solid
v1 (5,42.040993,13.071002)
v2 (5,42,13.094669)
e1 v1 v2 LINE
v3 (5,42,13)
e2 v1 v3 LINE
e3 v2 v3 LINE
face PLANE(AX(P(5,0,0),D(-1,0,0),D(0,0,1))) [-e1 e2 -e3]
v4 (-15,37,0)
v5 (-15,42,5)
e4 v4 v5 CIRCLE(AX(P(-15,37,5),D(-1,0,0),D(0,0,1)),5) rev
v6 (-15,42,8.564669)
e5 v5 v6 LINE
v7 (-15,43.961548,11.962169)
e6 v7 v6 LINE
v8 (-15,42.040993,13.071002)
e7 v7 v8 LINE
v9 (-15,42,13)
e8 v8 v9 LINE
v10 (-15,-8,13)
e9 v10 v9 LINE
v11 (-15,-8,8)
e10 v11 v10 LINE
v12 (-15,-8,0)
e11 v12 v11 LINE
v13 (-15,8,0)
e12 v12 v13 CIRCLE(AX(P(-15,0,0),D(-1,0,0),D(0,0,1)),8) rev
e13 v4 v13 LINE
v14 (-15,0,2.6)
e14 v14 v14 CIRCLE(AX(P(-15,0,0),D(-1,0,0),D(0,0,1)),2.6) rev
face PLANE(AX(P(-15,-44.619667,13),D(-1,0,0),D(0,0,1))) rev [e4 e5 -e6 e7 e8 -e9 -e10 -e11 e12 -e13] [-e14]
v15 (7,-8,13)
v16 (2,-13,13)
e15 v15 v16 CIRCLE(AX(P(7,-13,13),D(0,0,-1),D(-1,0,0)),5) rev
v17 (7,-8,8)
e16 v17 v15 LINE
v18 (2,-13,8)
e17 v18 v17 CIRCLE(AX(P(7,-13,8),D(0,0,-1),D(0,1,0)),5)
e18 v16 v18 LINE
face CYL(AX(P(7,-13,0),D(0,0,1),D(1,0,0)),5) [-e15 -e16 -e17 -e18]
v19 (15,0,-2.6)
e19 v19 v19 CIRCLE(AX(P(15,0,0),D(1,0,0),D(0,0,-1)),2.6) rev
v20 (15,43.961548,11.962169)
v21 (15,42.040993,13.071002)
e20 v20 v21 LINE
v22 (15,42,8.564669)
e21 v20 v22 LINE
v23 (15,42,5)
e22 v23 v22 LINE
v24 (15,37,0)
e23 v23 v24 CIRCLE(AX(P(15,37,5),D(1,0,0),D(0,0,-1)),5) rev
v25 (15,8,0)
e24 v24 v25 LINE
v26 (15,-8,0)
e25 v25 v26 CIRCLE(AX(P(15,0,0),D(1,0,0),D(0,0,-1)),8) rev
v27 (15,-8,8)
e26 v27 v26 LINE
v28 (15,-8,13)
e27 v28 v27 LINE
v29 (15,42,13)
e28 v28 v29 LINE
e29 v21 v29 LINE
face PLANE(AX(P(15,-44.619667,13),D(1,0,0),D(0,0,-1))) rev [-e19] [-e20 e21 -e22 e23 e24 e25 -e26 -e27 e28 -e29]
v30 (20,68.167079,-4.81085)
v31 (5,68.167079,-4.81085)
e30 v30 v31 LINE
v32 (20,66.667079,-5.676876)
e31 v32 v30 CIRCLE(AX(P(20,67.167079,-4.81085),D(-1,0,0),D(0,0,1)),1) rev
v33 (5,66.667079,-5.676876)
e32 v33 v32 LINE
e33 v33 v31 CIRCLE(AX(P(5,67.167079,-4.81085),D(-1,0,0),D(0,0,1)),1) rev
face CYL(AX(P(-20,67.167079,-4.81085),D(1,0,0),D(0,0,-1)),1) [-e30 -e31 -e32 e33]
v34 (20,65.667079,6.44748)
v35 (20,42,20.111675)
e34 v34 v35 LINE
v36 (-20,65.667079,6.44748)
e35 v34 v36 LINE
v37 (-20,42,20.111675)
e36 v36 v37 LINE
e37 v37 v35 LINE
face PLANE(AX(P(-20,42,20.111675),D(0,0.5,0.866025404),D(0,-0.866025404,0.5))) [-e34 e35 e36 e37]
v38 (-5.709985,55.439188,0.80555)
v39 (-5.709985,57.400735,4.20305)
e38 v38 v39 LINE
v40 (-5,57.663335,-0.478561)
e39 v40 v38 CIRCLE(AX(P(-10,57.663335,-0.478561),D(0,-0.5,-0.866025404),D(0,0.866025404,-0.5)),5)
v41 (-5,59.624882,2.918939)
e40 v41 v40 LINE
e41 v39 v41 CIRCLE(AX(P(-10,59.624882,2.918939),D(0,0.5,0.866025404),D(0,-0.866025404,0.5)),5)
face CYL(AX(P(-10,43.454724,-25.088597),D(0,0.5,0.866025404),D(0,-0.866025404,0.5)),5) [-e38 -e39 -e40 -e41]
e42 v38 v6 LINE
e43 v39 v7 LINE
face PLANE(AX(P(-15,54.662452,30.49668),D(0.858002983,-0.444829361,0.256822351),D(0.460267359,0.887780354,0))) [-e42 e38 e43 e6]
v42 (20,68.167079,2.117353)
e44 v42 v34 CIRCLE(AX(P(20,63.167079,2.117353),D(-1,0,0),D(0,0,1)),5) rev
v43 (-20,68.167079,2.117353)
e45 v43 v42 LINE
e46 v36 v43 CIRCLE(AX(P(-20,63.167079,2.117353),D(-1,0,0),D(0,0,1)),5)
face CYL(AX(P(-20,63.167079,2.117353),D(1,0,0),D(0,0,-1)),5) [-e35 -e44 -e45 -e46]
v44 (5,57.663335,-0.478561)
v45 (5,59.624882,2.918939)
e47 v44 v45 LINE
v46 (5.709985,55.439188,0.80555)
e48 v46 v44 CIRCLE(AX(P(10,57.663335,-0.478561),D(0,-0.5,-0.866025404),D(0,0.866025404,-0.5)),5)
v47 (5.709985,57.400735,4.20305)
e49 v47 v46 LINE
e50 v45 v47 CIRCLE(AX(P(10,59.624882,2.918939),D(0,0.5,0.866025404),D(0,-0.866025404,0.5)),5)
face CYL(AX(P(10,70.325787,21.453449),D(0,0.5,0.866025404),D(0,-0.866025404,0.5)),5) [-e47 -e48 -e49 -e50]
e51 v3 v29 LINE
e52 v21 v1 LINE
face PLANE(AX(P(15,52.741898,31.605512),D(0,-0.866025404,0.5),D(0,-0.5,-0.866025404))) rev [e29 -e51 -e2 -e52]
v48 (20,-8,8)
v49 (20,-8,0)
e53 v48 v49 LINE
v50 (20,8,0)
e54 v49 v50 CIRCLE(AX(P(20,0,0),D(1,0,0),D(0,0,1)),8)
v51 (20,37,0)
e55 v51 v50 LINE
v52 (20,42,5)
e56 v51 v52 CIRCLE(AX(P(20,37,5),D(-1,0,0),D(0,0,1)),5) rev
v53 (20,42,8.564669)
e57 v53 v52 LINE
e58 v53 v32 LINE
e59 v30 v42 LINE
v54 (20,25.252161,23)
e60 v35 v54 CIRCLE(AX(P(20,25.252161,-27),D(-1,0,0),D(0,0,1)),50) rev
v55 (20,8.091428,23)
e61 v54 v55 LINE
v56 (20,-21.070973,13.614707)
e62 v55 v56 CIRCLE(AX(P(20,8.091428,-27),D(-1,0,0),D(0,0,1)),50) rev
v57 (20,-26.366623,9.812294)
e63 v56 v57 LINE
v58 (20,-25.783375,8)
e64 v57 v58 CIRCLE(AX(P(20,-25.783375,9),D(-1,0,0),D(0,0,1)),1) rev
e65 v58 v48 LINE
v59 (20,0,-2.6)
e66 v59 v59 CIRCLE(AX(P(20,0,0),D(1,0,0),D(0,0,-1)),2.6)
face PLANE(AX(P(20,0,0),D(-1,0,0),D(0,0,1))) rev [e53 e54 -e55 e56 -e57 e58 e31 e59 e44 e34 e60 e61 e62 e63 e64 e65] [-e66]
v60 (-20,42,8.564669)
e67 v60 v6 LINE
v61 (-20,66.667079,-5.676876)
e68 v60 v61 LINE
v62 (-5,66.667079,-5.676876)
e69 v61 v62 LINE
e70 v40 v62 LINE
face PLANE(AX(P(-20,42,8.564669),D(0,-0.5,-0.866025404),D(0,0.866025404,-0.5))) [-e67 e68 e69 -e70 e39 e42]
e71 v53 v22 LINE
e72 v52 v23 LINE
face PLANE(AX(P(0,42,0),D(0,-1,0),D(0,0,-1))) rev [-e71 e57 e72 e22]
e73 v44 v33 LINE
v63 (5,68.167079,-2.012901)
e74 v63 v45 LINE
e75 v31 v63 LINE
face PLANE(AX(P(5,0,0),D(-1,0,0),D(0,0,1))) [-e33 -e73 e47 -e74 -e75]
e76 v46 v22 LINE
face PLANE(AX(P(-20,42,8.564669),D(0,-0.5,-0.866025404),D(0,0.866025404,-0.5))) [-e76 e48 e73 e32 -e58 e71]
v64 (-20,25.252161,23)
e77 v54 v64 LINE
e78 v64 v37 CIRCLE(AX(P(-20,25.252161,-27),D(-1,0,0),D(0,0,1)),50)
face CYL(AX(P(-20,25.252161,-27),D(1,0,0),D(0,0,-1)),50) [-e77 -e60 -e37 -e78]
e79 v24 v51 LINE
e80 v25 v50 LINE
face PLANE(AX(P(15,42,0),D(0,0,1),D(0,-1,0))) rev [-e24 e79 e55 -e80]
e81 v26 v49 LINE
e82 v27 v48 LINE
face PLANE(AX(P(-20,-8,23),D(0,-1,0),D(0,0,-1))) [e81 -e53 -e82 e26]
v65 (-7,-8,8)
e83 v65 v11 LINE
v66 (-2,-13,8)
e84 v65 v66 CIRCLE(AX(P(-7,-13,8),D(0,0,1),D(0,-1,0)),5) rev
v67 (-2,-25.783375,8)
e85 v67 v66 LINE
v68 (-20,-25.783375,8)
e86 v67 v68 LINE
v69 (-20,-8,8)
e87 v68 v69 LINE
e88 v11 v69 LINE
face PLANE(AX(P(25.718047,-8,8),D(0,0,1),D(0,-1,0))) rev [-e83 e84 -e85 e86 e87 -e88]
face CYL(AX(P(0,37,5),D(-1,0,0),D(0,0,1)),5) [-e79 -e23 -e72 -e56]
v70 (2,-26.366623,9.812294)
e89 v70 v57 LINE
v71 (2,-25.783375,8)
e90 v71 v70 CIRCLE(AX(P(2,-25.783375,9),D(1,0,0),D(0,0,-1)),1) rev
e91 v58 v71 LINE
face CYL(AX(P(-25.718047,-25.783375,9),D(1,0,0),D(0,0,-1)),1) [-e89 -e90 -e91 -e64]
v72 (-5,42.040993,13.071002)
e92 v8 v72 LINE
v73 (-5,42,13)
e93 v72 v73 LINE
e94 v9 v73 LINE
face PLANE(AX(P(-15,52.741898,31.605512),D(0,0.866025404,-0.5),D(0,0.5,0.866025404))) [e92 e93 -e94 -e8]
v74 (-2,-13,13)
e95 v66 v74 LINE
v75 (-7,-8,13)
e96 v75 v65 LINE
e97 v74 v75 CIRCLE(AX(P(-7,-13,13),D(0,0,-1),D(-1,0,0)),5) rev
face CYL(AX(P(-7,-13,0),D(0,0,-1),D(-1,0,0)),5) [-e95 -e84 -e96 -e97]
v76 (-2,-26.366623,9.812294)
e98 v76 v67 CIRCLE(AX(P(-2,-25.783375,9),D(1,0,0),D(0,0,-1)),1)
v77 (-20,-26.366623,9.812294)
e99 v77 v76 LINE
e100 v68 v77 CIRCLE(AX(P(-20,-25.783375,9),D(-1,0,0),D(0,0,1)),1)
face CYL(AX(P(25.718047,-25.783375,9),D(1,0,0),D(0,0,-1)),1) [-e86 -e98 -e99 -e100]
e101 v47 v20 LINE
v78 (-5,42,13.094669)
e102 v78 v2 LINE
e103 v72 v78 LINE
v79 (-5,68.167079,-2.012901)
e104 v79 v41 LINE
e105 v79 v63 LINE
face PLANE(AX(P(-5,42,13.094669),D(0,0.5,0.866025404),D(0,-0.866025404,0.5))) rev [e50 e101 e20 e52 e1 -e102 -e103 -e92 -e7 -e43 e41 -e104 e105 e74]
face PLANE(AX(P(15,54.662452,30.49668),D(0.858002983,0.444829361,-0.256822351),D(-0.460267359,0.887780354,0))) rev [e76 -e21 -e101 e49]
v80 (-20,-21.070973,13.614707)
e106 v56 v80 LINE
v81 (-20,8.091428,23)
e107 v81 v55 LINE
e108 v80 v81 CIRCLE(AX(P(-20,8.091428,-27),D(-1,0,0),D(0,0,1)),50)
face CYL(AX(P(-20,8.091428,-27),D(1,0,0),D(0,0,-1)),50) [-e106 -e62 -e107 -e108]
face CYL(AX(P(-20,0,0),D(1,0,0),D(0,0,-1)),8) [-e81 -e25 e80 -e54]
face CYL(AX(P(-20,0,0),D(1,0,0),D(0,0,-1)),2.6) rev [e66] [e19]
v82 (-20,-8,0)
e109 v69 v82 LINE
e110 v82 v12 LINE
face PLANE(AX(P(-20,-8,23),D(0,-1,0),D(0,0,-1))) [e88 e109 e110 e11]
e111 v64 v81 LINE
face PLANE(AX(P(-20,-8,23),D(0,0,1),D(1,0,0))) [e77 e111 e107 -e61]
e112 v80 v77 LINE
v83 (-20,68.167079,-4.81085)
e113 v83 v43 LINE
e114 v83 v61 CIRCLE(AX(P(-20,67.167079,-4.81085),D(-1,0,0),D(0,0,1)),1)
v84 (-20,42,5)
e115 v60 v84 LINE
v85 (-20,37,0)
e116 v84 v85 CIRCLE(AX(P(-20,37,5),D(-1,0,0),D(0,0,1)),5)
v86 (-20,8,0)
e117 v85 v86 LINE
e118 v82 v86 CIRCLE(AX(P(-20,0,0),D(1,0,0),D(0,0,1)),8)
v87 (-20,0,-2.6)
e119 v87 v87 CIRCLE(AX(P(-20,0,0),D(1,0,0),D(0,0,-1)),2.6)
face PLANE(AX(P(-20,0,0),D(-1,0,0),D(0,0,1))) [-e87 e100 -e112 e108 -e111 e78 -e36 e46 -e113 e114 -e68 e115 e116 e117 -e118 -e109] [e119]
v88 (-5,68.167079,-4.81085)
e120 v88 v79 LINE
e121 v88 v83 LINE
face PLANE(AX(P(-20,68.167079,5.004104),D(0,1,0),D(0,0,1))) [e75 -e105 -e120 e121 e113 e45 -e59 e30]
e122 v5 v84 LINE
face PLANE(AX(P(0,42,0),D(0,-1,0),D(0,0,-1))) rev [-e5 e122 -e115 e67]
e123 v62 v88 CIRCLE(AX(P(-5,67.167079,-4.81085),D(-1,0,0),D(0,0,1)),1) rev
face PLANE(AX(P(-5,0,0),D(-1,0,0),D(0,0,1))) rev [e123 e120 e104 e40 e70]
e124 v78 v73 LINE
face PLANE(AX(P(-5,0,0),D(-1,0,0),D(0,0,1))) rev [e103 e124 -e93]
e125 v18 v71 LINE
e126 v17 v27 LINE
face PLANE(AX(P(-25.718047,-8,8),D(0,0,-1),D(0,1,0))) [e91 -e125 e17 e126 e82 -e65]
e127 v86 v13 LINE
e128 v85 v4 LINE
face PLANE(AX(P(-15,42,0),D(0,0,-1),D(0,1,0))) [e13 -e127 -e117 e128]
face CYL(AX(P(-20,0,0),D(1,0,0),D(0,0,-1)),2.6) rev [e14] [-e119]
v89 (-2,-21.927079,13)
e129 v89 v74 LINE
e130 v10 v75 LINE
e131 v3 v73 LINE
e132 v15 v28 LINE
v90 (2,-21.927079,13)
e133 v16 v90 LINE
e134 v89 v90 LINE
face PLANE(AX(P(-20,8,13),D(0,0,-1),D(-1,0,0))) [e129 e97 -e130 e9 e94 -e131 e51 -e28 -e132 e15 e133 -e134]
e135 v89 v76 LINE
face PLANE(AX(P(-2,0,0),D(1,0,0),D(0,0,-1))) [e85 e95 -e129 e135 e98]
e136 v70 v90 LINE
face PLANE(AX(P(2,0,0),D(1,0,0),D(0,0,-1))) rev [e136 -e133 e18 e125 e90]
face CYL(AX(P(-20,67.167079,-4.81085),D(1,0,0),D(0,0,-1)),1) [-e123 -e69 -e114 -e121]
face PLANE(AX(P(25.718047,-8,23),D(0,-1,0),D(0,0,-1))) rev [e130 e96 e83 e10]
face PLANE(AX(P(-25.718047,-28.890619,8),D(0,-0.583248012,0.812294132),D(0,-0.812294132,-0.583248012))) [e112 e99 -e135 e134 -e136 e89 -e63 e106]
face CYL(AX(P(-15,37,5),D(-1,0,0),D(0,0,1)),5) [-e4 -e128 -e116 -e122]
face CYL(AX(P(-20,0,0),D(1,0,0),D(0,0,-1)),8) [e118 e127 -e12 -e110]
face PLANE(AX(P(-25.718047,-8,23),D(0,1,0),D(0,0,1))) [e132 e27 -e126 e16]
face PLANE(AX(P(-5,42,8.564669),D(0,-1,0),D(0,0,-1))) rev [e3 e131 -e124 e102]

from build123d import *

# Parameters (mm, degrees)
BOSS_EXTRUDE5_DEPTH      = 20
BOSS_EXTRUDE5_DEPTH_BACK = 20
SKETCH6_R                = 2.6000000000000005
SKETCH7_W                = 30.000000000000004
SKETCH7_H                = 21
CUT_EXTRUDE1_DEPTH       = 16
BOSS_EXTRUDE6_DEPTH      = 18
BOSS_EXTRUDE7_DEPTH      = 4
SKETCH12_W               = 4.9999999999999964
SKETCH12_H               = 12.999999999999998
BOSS_EXTRUDE8_DEPTH      = 34
FILLET4_R                = 5
FILLET5_R                = 1
CUT_EXTRUDE3_START       = -15
CUT_EXTRUDE3_DEPTH       = 10
CUT_EXTRUDE4_DEPTH       = 3.923095079
FILLET7_R                = 5
FILLET8_R                = 50


with BuildPart() as part:
    # Sketch6 → Boss-Extrude5 (new, two sides: drawn at the far end of the back side and taken through both)
    with BuildSketch(Plane(origin=(0, 0, 0), x_dir=(0, 0, -1), z_dir=(1, 0, 0)).offset(-BOSS_EXTRUDE5_DEPTH_BACK)):
        with BuildLine():
            Line((-23, -8), (0, -8))
            ThreePointArc((0, -8), (8, 0), (0, 8))
            Line((0, 8), (-13, 7.999999999999998))
            Line((-13, 7.999999999999998), (-13, 42))
            Line((-13, 42), (-8.56466921236316, 42))
            Line((-8.56466921236316, 42), (6.542901083469773, 68.16707933130117))
            Line((6.542901083469773, 68.16707933130117), (-5.004104300322731, 68.16707933130117))
            Line((-5.004104300322731, 68.16707933130117), (-20.111674596155662, 42))
            Line((-20.111674596155662, 42), (-23, 42))
            Line((-23, 42), (-23, -8))
        make_face()
        Circle(SKETCH6_R, mode=Mode.SUBTRACT)
    extrude(amount=BOSS_EXTRUDE5_DEPTH + BOSS_EXTRUDE5_DEPTH_BACK)

    # Sketch7 → Cut-Extrude1 (cut)
    with BuildSketch(Plane(origin=(0, 8, 1.07e-15), x_dir=(1, 0, 0), z_dir=(0, 1, 0))):
        with Locations((0, -2.4999999999999982)):
            Rectangle(SKETCH7_W, SKETCH7_H)
    extrude(amount=-CUT_EXTRUDE1_DEPTH, mode=Mode.SUBTRACT)

    # Sketch9 → Boss-Extrude6 (add)
    with BuildSketch(Plane(origin=(20, 0, 0), x_dir=(0, 0, -1), z_dir=(1, 0, 0))):
        Polygon((-8, -8), (-7.9999999999999964, -28.890618944469697), (-23, -8), align=None)
    boss_extrude6 = extrude(amount=-BOSS_EXTRUDE6_DEPTH)

    # Mirror1: Boss-Extrude6 across plane
    add(boss_extrude6.mirror(Plane(origin=(0, 0, 0), x_dir=(0, 0, 1), z_dir=(1, 0, 0))))

    # Sketch10 → Boss-Extrude7 (add)
    with BuildSketch(Plane.ZY.offset(-2)):
        Polygon((23, -8), (13, -8), (13.000000000000004, -21.927079296313124), align=None)
    extrude(amount=BOSS_EXTRUDE7_DEPTH)

    # Sketch12 → Boss-Extrude8 (add)
    with BuildSketch(Plane(origin=(0, 8, 1.07e-15), x_dir=(1, 0, 0), z_dir=(0, 1, 1.3e-16))):
        with Locations((17.5, -6.499999999999999)):
            Rectangle(SKETCH12_W, SKETCH12_H)
    boss_extrude8 = extrude(amount=BOSS_EXTRUDE8_DEPTH)

    # Mirror2: Boss-Extrude8 across plane
    add(boss_extrude8.mirror(Plane(origin=(0, 0, 0), x_dir=(0, 0, 1), z_dir=(1, 0, 0))))

    # Fillet4
    fillet4_edges = [part.edges().sort_by_distance(p)[0] for p in [
        (2, -8, 10.5),
        (-2, -8, 10.5),
    ]]
    fillet(fillet4_edges, radius=FILLET4_R)

    # Fillet5
    fillet5_edges = [part.edges().sort_by_distance(p)[0] for p in [
        (0, 68.16707933130117, -6.542901083469773),
        (11, -28.890618944469697, 7.9999999999999964),
        (-11, -28.890618944469697, 7.9999999999999964),
    ]]
    fillet(fillet5_edges, radius=FILLET5_R)

    # Sketch13 → Cut-Extrude3 (cut)
    with BuildSketch(Plane(origin=(20, 0, 0), x_dir=(0, 0, -1), z_dir=(1, 0, 0)).offset(CUT_EXTRUDE3_START)):
        Polygon((6.542901083469864, 68.16707933130117), (-8.56466921236316, 42), (-13.094669212363161, 42), (2.0129010834698517, 68.16707933130117), align=None)
    extrude(amount=-CUT_EXTRUDE3_DEPTH, mode=Mode.SUBTRACT)

    # Sketch14 → Cut-Extrude4 (cut)
    with BuildSketch(Plane(origin=(0, 14.20861055645838, 24.61003538874555), x_dir=(-1, 0, 0), z_dir=(0, -0.49999999999999784, -0.8660254037844399))):
        Polygon((-15.000000000000004, 32.090732352764924), (-5.000000000000001, 48.794944027775955), (-5.000000000000001, 32.090732352764924), (-5.000000000000001, 29.87306695894652), (-15.000000000000007, 29.87306695894652), align=None)
    cut_extrude4 = extrude(amount=-CUT_EXTRUDE4_DEPTH, mode=Mode.SUBTRACT)

    # Mirror3: Cut-Extrude4 across plane
    add(cut_extrude4.mirror(Plane(origin=(0, 0, 0), x_dir=(0, 0, 1), z_dir=(1, 0, 0))), mode=Mode.SUBTRACT)

    # Fillet7
    fillet7_edges = [part.edges().sort_by_distance(p)[0] for p in [
        (17.5, 42, 5.6e-15),
        (-17.5, 42, 5.6e-15),
        (0, 68.16707933130117, 5.004104300322731),
        (5.000000000000001, 57.44704543050219, 1.9113133747955424),
        (-5.000000000000001, 57.44704543050219, 1.9113133747955426),
    ]]
    fillet(fillet7_edges, radius=FILLET7_R)

    # Fillet8
    # the kernel refuses this fillet: 50 mm, written as the material it takes off along each edge
    with BuildSketch(Plane(origin=(61.869597916190855, 42, 23), x_dir=(0, 0, -1), z_dir=(-1, 0, 0))) as fillet8_piece_1:
        with BuildLine():
            CenterArc((50, 16.747839166469827), FILLET8_R, 180, 19.569909983271373)
            Line((0, 16.747839166469827), (-1, 16.747839166469827))
            Line((-1, 16.747839166469827), (-1, 0))
            Line((-1, 0), (0, -1))
            ThreePointArc((0, -1), (1.444162701922167, -1), (1.946091911921222, -0.33495678332939605))
            Line((1.946091911921222, -0.33495678332939605), (2.888325403844334, 0))
        make_face()
    extrude(amount=123.73919583238171, mode=Mode.SUBTRACT)
    with BuildSketch(Plane(origin=(-60.228570108654466, -8.000000000000004, 23), x_dir=(0, -0.812294131590468, -0.5832480122415225), z_dir=(1, 0, 0))) as fillet8_piece_2:
        with BuildLine():
            CenterArc((FILLET8_R * 0.321828560869, FILLET8_R), FILLET8_R, 234.32068370191269, 35.67931629808726)
            Line((-FILLET8_R * 0.261419451372, FILLET8_R * 0.18770586841), (-FILLET8_R * 0.273084411617, FILLET8_R * 0.171459985778))
            Line((-FILLET8_R * 0.273084411617, FILLET8_R * 0.171459985778), (-FILLET8_R * 0.00643657121738, -FILLET8_R * 0.02))
            Line((-FILLET8_R * 0.00643657121738, -FILLET8_R * 0.02), (FILLET8_R * 0.321828560869, -FILLET8_R * 0.02))
            Line((FILLET8_R * 0.321828560869, -FILLET8_R * 0.02), (FILLET8_R * 0.321828560869, 5e-16))
        make_face()
    extrude(amount=120.45714021730896, mode=Mode.SUBTRACT)


solid = part.part
